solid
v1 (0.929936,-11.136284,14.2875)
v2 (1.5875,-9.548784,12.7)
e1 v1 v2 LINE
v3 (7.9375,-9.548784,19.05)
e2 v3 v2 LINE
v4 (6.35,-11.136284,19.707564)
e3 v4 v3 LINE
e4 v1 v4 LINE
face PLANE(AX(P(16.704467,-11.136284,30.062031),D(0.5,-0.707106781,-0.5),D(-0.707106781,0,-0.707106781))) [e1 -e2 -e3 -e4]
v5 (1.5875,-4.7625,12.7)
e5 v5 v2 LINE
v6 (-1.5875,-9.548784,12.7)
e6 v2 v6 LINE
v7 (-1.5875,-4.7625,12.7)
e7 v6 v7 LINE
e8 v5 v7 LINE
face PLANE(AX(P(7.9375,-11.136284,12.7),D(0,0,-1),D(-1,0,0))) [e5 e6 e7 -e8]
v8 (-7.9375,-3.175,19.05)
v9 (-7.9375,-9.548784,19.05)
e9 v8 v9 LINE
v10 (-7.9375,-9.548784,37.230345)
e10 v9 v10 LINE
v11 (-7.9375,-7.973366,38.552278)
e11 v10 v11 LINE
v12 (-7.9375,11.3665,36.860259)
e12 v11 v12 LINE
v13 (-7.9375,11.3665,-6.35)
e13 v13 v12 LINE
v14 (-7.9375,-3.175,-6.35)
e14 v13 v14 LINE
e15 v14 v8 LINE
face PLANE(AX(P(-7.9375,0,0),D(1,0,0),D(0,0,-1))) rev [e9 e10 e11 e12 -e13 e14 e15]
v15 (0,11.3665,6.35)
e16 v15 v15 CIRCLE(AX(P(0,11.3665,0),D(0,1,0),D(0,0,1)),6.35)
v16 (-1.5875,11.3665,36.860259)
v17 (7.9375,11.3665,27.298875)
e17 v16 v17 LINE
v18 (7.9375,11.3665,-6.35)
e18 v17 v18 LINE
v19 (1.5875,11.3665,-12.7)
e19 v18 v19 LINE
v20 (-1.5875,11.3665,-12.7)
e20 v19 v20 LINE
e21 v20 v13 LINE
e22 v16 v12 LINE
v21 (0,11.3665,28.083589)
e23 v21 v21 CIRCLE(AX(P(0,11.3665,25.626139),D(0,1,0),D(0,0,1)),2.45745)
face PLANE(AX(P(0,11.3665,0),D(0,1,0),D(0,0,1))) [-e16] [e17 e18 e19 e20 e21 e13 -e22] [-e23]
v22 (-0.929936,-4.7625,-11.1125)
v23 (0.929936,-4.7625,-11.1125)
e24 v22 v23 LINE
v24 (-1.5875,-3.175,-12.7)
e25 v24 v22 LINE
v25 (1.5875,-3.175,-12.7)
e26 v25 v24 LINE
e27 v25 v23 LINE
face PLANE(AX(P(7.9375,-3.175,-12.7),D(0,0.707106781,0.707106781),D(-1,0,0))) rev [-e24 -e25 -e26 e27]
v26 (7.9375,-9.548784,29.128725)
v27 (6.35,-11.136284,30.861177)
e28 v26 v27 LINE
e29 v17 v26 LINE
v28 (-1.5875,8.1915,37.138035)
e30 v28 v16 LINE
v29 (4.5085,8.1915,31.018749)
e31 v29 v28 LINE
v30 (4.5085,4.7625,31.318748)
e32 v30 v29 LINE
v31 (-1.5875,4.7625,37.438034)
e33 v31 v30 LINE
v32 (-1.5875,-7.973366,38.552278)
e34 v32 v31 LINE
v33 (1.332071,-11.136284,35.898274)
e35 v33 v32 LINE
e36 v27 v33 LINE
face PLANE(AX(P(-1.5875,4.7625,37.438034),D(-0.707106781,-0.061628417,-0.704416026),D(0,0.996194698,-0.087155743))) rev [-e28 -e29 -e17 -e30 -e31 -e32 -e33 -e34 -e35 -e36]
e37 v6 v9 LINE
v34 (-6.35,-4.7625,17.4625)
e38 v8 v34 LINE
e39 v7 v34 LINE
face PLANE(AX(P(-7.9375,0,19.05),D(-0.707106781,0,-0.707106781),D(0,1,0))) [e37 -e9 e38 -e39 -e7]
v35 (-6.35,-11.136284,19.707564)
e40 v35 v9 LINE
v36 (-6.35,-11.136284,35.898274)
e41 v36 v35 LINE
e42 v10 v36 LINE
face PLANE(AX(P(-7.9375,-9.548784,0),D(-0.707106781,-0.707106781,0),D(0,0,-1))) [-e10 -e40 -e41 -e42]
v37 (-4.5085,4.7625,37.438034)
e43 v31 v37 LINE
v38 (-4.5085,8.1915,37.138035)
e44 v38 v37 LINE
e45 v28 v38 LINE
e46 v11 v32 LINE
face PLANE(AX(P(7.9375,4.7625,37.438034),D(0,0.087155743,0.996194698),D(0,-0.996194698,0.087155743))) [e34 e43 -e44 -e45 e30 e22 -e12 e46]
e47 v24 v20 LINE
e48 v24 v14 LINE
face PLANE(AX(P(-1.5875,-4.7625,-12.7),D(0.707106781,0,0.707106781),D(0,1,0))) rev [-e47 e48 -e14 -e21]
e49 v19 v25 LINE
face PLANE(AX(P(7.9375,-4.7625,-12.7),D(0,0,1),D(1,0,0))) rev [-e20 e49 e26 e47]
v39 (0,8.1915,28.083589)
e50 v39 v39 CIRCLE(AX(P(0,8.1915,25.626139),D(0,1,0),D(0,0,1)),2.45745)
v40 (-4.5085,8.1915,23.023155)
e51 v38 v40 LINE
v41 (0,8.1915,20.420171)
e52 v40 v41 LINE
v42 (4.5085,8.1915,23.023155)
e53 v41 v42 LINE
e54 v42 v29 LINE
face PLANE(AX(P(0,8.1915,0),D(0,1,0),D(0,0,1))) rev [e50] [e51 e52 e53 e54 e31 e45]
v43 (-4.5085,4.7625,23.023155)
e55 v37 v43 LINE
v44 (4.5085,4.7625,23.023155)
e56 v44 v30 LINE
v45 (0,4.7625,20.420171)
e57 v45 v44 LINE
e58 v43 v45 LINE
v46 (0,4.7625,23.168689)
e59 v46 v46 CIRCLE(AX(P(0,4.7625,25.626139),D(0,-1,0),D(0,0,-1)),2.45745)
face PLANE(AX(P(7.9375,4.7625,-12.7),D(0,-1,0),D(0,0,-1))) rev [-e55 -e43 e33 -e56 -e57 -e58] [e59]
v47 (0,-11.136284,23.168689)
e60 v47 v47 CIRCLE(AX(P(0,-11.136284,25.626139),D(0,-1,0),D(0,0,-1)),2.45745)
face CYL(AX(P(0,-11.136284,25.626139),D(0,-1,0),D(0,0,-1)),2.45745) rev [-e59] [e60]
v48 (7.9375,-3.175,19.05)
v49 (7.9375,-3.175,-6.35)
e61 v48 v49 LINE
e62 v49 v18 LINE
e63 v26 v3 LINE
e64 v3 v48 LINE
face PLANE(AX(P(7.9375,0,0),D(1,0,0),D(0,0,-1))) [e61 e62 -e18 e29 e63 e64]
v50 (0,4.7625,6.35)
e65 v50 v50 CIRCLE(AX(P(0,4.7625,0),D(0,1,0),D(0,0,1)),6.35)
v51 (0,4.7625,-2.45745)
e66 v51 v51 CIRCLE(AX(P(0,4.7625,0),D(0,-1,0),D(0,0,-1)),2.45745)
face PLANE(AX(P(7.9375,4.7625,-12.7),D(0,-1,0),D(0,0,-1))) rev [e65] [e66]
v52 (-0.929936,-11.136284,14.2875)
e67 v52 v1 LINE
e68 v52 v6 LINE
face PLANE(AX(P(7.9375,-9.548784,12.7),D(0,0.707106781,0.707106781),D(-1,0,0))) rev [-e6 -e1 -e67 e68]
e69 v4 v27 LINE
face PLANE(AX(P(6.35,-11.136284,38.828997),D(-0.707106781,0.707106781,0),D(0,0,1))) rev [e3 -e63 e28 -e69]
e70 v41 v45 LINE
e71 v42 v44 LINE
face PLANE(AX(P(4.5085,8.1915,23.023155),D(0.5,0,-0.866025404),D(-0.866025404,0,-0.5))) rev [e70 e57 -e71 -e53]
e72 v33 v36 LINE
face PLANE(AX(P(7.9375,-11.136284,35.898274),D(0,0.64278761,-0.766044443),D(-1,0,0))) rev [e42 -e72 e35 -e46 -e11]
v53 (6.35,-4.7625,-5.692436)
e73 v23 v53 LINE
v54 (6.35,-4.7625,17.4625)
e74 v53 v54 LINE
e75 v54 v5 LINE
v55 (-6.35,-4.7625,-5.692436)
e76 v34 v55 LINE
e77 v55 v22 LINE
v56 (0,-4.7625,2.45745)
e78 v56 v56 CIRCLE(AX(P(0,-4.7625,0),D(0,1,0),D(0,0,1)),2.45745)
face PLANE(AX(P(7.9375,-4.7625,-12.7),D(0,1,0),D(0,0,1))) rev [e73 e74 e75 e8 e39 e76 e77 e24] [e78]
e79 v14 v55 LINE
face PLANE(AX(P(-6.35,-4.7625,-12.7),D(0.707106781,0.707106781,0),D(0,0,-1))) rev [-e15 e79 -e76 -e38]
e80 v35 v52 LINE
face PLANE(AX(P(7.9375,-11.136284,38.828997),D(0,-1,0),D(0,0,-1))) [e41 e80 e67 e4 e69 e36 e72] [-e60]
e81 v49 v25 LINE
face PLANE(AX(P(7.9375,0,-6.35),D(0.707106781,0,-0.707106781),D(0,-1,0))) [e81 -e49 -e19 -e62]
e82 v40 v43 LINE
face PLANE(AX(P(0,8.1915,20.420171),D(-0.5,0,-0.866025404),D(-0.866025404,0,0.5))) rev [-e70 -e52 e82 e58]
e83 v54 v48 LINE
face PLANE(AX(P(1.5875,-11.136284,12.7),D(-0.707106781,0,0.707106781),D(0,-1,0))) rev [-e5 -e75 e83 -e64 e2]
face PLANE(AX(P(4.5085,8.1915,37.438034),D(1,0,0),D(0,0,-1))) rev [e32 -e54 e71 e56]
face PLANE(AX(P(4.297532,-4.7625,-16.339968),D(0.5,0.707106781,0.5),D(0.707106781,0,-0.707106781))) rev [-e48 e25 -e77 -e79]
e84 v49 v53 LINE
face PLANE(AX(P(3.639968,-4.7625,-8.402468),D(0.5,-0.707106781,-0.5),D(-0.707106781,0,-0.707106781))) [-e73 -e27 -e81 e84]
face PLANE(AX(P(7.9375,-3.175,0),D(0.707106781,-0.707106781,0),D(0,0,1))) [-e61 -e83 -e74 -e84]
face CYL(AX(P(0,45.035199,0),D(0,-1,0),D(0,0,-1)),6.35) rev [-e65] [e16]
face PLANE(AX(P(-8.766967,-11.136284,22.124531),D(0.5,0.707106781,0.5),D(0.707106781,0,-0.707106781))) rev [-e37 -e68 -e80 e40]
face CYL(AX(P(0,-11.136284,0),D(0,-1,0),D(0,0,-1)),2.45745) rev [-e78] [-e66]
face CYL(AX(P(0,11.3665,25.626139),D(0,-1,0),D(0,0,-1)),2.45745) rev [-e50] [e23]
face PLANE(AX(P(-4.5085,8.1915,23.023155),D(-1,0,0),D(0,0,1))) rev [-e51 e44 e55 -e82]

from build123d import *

# Parameters (mm, degrees)
SKETCH1_W             = 25.4
SKETCH1_H             = 9.525
BOSS_EXTRUDE1_DEPTH   = 7.9375
BOSS_EXTRUDE2_DEPTH   = 15.875
CHAMFER1_SIZE         = 6.35
CHAMFER2_SIZE         = 3.175
CHAMFER2_SIZE2        = 2.93072295
F_8_CLEARANCE_HOLE1_D = 4.9149
CHAMFER3_SIZE         = 1.5875
BOSS_EXTRUDE3_DEPTH   = 3.429
BOSS_EXTRUDE4_START   = 3.175
SKETCH6_W             = 15.875
SKETCH6_H             = 20.446862299
SKETCH6_R             = 2.45745
BOSS_EXTRUDE4_DEPTH   = 3.175
SKETCH7_R             = 6.35
BOSS_EXTRUDE5_DEPTH   = 6.604
CUT_EXTRUDE1_DEPTH    = 44.214477453
CHAMFER5_SIZE         = 9.525


with BuildPart() as part:
    # Sketch1 → Boss-Extrude1 (new, symmetric)
    with BuildSketch(Plane(origin=(0, 0, 0), x_dir=(0, 0, -1), z_dir=(1, 0, 0))):
        Rectangle(SKETCH1_W, SKETCH1_H)
    extrude(amount=BOSS_EXTRUDE1_DEPTH, both=True)

    # Sketch2 → Boss-Extrude2 (add, through all)
    with BuildSketch(Plane.ZY.offset(7.9375)):
        Polygon((12.7, 4.7625), (37.438033761, 4.7625), (38.828997162, -11.13628443), (12.7, -11.13628443), align=None)
    extrude(amount=-BOSS_EXTRUDE2_DEPTH)

    # Chamfer1
    chamfer1_edges = [part.edges().sort_by_distance(p)[0] for p in [
        (7.9375, 0, -12.7),
        (7.9375, -7.949392215, 12.7),
        (-7.9375, -7.949392215, 12.7),
        (-7.9375, 0, -12.7),
    ]]
    chamfer(chamfer1_edges, length=CHAMFER1_SIZE)

    # Chamfer2
    chamfer2_edges = [part.edges().sort_by_distance(p)[0] for p in [
        (0, -11.13628443, 38.828997162),
    ]]
    chamfer2_side = [part.faces().sort_by_distance(p)[0] for p in [
        (0, -3.186892215, 38.133515462),
    ]]
    chamfer(chamfer2_edges, length=CHAMFER2_SIZE, length2=CHAMFER2_SIZE2, reference=chamfer2_side[0])

    # #8 Clearance Hole1 (through all)
    with Locations(Plane(origin=(0, -11.13628443, 0), x_dir=(-1, 0, 0), z_dir=(0, -1, 0))):
        with Locations((0, -25.62613884), (0, 0)):
            Hole(F_8_CLEARANCE_HOLE1_D / 2)

    # Chamfer3
    chamfer3_edges = [part.edges().sort_by_distance(p)[0] for p in [
        (0, -11.13628443, 12.7),
        (-7.9375, -11.13628443, 27.474137106),
        (7.9375, -11.13628443, 27.474137106),
        (-4.7625, -11.13628443, 15.875),
        (4.7625, -11.13628443, 15.875),
        (0, -4.7625, -12.7),
        (-4.7625, -4.7625, -9.525),
        (4.7625, -4.7625, -9.525),
        (-7.9375, -4.7625, 6.35),
        (7.9375, -4.7625, 6.35),
    ]]
    chamfer(chamfer3_edges, length=CHAMFER3_SIZE)

    # Sketch5 → Boss-Extrude3 (add)
    with BuildSketch(Plane(origin=(0, 4.7625, 0), x_dir=(1, 0, 0), z_dir=(0, 1, 0))):
        Polygon((4.5085, -37.438033761), (4.5085, -23.023155151), (0, -20.420171462), (-4.5085, -23.023155151), (-4.5085, -37.438033761), (-7.9375, -37.438033761), (-7.9375, -16.991171462), (7.9375, -16.991171462), (7.9375, -37.438033761), align=None)
    extrude(amount=BOSS_EXTRUDE3_DEPTH)

    # Sketch6 → Boss-Extrude4 (add)
    with BuildSketch(Plane(origin=(0, 8.1915, 0), x_dir=(1, 0, 0), z_dir=(0, 1, 0)).offset(BOSS_EXTRUDE4_START)):
        with Locations((0, -27.214602611)):
            Rectangle(SKETCH6_W, SKETCH6_H)
        with Locations(Location((0, -25.62613884, 0), (0, 0, 90))):
            Circle(SKETCH6_R, mode=Mode.SUBTRACT)
    extrude(amount=-BOSS_EXTRUDE4_DEPTH)

    # Sketch7 → Boss-Extrude5 (add)
    with BuildSketch(Plane(origin=(0, 4.7625, 0), x_dir=(1, 0, 0), z_dir=(0, 1, 0))):
        Polygon((-7.9375, 6.35), (-7.9375, -16.991171462), (7.9375, -16.991171462), (7.9375, 6.35), (1.5875, 12.7), (-1.5875, 12.7), align=None)
        with Locations(Location((0, 0, 0), (0, 0, 270))):
            Circle(SKETCH7_R, mode=Mode.SUBTRACT)
    extrude(amount=BOSS_EXTRUDE5_DEPTH)

    # Sketch8 → Cut-Extrude1 (cut, through all)
    with BuildSketch(Plane.ZY.offset(7.9375)):
        Polygon((37.438033761, 4.7625), (36.860258627, 11.3665), (37.438033761, 11.3665), align=None)
    extrude(amount=-CUT_EXTRUDE1_DEPTH, mode=Mode.SUBTRACT)

    # Chamfer5
    # the kernel refuses this chamfer: 9.525 mm, written as the material it takes off along each edge
    with BuildSketch(Plane(origin=(7.9375, -32.375434787, 40.687182042), x_dir=(0.027495876610586376, -0.08712279063518516, -0.9958180537233462), z_dir=(0, 0.9961946980917505, -0.0871557427476014))) as chamfer5_piece_1:
        Polygon((CHAMFER5_SIZE * 0.999621916911, CHAMFER5_SIZE * 0.0274958766106), (-CHAMFER5_SIZE * 0.0274958766106, CHAMFER5_SIZE * 0.999621916911), (0, 0), align=None)
    extrude(amount=68.404302332, mode=Mode.SUBTRACT)


solid = part.part
